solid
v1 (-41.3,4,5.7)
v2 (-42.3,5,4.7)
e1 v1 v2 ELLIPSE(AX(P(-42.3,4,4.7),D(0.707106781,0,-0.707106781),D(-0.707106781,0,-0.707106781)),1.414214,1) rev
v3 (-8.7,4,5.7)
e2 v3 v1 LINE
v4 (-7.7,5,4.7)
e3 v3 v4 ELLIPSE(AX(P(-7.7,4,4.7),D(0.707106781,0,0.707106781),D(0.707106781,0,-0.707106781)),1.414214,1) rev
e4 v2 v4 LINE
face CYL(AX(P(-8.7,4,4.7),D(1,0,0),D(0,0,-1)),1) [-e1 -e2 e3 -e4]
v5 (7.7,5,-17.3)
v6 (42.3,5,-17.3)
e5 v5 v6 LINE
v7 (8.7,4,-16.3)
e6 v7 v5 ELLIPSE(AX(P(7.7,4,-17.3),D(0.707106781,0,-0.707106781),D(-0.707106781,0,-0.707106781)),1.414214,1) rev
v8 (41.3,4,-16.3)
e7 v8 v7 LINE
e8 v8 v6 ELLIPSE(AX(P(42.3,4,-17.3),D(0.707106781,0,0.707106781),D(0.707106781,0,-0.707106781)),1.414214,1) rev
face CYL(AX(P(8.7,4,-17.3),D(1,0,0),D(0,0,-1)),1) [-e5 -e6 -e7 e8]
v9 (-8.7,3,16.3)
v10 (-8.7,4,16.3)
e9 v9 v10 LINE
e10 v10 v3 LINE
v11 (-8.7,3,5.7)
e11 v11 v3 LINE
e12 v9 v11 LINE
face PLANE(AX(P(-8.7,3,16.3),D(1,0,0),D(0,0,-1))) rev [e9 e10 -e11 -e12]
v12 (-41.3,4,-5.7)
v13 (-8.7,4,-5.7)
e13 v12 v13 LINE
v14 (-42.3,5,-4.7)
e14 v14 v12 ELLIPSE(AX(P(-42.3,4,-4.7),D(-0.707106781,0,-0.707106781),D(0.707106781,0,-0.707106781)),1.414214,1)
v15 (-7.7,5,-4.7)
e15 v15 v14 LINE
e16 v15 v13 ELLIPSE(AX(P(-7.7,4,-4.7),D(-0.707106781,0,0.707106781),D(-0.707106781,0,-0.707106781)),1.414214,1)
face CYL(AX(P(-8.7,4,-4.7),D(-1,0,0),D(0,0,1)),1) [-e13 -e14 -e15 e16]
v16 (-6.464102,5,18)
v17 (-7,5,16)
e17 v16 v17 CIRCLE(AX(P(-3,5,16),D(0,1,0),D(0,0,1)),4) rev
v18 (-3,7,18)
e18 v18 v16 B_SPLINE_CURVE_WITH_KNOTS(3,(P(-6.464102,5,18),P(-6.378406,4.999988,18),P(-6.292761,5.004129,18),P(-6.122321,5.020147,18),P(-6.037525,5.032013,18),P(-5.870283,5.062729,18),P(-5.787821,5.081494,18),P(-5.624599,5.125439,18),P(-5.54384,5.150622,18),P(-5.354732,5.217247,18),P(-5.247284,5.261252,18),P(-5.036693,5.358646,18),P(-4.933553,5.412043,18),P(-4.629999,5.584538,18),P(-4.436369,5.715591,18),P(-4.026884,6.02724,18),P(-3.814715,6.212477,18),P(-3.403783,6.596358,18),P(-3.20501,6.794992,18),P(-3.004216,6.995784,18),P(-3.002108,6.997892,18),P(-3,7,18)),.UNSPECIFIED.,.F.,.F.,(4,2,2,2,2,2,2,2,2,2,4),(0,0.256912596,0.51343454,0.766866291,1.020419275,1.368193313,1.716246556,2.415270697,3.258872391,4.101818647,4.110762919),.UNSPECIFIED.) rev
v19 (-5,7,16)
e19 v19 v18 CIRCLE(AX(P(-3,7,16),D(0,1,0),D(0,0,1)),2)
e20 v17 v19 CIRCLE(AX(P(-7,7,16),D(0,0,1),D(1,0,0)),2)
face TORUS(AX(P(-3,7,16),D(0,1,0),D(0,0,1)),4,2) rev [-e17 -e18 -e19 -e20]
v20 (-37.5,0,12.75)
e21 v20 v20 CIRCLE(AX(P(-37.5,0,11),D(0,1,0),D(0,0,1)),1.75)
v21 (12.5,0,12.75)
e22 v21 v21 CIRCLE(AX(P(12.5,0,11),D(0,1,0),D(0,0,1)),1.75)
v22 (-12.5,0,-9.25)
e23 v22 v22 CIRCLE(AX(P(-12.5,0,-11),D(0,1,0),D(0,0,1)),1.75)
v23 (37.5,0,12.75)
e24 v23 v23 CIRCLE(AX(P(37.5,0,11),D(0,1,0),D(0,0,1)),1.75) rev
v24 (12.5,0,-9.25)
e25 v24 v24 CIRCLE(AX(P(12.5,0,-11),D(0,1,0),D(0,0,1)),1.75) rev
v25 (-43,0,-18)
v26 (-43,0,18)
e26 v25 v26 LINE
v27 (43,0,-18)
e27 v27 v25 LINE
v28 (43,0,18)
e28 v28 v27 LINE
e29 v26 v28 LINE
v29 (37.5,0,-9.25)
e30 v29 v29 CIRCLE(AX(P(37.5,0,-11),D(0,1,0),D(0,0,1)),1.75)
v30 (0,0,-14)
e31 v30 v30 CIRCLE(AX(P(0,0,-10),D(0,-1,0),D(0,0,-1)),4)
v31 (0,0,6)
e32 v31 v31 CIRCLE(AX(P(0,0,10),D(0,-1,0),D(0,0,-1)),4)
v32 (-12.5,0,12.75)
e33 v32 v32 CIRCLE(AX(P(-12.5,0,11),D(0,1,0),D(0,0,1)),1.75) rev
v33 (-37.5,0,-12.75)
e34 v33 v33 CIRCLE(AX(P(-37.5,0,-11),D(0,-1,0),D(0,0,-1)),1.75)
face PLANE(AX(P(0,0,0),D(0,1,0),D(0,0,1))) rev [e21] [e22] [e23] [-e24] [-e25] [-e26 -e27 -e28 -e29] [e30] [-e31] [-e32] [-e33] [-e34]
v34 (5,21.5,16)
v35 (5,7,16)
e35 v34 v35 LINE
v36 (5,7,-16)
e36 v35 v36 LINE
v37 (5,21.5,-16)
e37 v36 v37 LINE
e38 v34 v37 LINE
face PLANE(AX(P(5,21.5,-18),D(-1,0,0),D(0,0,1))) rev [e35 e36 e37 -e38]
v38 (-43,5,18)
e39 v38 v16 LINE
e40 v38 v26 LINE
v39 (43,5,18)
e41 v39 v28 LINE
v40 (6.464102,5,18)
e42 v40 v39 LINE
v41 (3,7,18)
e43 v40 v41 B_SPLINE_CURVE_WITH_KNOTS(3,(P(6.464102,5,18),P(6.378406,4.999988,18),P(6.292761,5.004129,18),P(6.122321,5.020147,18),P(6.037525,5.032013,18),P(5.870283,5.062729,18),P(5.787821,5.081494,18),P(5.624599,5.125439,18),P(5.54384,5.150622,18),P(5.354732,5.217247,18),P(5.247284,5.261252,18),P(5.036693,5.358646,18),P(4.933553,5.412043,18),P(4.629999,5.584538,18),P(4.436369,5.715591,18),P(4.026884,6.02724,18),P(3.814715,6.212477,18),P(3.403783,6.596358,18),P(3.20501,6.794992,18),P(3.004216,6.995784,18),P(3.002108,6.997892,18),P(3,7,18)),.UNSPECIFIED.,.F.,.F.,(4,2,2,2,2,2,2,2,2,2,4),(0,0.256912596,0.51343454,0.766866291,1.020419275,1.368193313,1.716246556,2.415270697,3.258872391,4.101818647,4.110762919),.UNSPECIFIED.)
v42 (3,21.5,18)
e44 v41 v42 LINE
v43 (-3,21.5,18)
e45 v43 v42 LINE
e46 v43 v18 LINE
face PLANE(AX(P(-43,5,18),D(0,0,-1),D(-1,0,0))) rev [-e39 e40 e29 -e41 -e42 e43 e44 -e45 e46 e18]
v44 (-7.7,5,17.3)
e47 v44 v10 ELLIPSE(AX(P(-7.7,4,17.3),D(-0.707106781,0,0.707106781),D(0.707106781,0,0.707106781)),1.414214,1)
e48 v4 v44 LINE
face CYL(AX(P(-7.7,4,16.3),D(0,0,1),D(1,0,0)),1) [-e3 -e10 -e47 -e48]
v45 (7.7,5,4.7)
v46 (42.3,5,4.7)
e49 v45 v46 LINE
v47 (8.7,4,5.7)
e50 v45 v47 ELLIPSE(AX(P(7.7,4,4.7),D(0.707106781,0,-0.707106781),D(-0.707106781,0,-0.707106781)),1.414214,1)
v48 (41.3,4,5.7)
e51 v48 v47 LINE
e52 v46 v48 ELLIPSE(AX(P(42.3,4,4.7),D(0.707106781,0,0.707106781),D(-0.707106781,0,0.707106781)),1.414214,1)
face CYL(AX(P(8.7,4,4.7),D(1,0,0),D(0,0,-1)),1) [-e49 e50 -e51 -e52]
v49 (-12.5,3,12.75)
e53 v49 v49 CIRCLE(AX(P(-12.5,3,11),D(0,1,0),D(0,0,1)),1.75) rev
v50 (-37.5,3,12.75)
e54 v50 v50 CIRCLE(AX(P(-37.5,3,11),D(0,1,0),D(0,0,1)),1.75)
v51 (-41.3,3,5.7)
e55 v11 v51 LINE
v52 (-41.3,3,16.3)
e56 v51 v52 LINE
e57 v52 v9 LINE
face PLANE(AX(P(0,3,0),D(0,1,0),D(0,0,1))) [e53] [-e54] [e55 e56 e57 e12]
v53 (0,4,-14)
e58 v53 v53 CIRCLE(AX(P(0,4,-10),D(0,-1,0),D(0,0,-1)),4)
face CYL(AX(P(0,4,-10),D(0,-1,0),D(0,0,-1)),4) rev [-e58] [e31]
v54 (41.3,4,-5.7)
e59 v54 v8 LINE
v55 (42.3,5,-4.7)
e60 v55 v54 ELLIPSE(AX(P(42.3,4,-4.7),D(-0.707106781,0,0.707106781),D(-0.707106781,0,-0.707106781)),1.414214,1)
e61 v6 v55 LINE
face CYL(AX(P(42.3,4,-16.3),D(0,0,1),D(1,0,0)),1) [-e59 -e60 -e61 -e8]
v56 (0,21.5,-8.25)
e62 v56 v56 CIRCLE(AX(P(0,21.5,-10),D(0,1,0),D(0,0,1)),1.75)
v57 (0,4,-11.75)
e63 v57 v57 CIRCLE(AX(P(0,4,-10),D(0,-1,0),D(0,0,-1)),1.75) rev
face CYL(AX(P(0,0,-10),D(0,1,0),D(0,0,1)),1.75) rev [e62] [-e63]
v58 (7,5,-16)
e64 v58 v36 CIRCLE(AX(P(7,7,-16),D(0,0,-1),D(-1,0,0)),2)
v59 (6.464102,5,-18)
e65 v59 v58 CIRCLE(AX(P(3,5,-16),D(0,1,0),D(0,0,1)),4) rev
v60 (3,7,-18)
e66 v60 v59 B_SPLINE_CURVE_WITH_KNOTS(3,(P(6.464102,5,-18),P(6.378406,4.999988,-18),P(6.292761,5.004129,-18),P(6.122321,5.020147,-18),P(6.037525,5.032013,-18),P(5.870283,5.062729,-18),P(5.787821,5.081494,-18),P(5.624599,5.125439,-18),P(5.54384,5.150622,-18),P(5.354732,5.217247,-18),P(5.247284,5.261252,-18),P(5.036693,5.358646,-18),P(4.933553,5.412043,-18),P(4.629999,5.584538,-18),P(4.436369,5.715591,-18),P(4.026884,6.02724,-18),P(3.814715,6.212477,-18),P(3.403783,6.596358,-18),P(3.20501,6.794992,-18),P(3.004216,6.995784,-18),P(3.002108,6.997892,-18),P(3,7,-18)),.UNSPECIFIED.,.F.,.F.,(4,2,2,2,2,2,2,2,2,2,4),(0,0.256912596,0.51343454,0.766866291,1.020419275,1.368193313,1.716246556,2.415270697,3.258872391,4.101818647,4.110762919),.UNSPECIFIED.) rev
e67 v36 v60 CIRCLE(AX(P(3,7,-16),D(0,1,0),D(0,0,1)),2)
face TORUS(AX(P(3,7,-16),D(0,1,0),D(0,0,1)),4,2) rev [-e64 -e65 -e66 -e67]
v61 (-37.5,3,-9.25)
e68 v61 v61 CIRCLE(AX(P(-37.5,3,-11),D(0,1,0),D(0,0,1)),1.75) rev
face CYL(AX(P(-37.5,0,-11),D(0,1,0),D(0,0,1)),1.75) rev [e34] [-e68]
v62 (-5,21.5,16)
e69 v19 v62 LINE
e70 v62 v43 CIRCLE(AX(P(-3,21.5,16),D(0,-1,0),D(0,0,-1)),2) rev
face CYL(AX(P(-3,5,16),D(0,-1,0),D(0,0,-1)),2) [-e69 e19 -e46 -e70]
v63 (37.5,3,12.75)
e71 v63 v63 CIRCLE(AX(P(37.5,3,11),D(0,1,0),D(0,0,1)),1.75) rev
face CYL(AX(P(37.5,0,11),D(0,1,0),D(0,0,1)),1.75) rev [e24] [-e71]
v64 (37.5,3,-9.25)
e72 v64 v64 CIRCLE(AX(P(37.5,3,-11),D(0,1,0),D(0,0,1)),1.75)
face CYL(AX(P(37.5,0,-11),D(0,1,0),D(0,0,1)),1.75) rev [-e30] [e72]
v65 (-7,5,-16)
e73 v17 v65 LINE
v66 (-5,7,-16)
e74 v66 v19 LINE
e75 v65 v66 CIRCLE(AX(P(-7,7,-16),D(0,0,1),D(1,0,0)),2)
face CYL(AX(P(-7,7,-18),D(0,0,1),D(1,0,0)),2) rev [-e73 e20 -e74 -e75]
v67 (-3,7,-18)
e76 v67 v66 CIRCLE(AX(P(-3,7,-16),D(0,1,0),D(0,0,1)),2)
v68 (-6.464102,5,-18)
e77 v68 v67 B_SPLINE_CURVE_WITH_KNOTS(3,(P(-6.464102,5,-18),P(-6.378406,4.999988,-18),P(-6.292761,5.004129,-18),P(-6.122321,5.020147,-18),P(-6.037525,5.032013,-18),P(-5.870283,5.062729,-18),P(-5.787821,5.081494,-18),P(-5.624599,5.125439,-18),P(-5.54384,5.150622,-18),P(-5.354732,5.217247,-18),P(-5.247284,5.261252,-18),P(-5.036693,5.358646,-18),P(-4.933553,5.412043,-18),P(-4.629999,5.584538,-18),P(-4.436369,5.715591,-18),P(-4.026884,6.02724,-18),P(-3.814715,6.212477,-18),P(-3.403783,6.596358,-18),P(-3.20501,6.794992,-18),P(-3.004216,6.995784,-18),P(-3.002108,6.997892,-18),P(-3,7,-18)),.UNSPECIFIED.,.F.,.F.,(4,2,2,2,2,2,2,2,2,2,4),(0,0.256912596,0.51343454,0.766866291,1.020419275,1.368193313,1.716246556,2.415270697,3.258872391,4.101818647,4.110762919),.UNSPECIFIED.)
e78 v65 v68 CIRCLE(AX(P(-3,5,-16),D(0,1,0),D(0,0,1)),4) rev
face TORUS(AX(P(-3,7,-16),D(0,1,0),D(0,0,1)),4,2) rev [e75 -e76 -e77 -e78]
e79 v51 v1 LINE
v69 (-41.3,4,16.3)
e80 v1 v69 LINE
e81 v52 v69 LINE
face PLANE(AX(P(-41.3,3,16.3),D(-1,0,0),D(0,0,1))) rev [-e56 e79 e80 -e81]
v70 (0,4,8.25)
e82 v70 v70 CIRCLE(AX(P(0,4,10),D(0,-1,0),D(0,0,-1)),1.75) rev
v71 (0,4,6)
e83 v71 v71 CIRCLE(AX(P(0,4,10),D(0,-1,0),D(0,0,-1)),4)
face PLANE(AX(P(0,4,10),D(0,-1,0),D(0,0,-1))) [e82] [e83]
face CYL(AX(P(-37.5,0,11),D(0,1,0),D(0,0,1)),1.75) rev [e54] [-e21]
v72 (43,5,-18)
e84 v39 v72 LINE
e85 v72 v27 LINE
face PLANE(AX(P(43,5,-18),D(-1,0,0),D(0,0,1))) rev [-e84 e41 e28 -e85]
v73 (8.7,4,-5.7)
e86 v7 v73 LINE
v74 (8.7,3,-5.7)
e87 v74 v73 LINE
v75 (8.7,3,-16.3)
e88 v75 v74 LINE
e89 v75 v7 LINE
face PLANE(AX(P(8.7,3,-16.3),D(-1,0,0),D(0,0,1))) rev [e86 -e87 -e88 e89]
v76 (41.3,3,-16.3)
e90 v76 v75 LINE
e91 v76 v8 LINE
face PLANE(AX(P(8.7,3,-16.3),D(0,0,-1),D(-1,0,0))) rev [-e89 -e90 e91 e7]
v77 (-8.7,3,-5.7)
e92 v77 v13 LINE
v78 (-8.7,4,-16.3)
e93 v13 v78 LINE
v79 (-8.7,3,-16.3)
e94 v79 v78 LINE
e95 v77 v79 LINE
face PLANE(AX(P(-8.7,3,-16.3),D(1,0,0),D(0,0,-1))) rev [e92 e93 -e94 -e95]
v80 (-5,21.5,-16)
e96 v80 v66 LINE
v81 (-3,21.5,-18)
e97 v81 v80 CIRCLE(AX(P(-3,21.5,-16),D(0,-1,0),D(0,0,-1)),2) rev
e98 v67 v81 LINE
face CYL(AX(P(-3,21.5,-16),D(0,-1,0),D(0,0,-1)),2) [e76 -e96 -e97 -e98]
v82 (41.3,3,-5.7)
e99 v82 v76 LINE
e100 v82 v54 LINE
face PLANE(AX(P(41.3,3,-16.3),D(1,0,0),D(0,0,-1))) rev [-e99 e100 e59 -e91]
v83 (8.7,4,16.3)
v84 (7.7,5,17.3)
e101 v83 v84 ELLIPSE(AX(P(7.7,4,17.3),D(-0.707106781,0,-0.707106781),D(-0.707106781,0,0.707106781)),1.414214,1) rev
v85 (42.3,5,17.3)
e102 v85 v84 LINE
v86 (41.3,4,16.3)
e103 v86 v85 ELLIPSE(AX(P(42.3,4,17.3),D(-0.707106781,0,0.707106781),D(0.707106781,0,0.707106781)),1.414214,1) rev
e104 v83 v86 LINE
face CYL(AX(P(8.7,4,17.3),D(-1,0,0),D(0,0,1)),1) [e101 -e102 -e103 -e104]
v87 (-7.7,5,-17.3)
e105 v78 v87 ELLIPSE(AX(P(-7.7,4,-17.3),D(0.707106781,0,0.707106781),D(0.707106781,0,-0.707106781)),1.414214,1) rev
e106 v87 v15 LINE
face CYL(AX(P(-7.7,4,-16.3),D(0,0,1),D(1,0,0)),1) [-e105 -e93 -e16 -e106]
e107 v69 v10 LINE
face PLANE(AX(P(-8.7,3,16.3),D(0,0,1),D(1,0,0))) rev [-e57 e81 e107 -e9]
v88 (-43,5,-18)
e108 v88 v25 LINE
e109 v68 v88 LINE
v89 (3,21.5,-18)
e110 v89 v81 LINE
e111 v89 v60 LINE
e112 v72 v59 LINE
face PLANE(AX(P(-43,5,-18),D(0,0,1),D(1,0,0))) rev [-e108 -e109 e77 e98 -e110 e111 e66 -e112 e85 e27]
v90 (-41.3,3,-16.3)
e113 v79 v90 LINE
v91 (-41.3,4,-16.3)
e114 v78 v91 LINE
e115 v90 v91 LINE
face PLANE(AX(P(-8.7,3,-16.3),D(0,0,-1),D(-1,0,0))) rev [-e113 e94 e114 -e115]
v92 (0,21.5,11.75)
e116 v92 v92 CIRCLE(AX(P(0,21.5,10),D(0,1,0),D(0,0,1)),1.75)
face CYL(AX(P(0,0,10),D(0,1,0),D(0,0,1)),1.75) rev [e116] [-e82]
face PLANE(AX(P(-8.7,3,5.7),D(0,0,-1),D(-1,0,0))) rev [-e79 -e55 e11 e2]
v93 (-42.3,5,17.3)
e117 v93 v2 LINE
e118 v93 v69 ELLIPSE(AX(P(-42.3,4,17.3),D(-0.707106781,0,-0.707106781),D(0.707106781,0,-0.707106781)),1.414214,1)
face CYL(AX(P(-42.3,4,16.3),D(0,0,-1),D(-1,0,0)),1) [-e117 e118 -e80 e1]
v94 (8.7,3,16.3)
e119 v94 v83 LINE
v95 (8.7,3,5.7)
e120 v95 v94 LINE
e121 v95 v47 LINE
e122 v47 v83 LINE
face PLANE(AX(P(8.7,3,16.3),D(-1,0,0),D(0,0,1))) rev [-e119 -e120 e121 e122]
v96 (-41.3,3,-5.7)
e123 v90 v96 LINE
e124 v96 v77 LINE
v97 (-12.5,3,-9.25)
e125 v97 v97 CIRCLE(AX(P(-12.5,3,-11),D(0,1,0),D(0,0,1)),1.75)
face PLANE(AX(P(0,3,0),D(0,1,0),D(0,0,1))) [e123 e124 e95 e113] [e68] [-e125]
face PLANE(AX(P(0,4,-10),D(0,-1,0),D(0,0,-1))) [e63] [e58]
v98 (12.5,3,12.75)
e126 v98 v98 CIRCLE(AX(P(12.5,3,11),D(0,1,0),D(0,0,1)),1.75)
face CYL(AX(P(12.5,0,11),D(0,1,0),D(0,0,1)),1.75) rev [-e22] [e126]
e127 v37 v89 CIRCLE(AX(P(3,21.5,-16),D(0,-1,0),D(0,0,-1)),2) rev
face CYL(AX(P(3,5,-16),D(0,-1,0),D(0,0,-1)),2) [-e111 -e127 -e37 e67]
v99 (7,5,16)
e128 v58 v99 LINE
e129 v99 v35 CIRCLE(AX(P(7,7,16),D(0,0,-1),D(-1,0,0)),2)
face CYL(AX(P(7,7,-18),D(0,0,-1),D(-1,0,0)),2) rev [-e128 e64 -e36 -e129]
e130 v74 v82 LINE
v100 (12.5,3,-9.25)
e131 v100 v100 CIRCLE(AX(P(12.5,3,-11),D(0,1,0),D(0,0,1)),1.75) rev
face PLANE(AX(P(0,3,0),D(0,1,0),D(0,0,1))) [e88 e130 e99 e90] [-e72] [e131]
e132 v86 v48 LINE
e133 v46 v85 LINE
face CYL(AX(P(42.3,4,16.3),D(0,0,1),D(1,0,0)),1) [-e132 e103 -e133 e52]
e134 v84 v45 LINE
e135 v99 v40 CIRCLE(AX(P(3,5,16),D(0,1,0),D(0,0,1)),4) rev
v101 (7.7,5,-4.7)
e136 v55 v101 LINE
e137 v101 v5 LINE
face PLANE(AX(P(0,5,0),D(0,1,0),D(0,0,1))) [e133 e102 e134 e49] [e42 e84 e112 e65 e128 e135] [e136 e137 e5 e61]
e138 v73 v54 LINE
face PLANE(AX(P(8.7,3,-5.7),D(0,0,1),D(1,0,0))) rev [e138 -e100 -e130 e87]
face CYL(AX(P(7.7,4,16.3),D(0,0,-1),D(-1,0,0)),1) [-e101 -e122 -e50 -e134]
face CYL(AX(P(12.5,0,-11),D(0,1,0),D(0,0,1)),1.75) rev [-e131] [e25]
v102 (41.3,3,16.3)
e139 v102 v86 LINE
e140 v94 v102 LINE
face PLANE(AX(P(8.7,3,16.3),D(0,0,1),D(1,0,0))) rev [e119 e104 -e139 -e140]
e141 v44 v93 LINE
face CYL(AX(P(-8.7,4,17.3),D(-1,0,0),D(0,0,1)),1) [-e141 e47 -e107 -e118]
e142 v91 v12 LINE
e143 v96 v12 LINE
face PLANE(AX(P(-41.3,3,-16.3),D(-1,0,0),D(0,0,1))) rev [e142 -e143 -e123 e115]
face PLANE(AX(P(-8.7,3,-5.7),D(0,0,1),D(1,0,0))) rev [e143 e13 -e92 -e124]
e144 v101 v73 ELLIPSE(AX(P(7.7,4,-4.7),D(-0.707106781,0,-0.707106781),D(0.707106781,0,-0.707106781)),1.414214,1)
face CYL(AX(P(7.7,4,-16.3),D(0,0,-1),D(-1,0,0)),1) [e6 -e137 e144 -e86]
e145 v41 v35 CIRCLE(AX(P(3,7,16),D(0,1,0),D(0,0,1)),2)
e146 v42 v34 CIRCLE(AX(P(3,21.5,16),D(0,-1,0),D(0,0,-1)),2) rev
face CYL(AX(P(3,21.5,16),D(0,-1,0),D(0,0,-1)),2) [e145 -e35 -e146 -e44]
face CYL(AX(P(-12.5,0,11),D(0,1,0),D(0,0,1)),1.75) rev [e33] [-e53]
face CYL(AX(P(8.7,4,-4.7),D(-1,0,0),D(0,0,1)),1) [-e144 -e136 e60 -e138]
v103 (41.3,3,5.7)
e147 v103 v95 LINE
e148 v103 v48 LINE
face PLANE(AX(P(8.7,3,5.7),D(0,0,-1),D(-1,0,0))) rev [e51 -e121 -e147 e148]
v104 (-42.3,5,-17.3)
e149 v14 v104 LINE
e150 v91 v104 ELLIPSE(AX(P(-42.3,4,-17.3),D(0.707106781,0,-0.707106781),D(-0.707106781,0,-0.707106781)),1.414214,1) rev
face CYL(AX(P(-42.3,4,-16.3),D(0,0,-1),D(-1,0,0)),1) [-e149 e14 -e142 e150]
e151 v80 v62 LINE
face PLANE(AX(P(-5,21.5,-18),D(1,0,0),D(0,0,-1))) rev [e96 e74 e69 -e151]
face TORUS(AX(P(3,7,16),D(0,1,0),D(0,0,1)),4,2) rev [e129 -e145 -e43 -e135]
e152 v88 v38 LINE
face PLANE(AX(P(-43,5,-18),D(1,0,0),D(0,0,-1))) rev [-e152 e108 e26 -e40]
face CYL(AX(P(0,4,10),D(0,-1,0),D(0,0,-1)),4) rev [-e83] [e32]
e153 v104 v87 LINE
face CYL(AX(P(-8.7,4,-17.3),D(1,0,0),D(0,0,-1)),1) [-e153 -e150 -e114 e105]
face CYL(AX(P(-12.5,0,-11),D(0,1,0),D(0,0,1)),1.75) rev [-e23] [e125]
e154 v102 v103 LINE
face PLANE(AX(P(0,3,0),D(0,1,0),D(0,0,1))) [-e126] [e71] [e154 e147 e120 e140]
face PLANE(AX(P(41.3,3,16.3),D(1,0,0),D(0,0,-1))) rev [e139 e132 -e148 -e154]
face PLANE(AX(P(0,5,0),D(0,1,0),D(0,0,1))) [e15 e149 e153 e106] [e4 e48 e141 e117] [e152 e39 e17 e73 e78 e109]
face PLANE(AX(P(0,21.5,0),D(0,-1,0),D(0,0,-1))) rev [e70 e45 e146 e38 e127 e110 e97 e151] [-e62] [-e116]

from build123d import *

# Parameters (mm, degrees)
SKETCH_1_W          = 86
SKETCH_1_H          = 36
EXTRUDE_1_DEPTH     = 5
SKETCH_5_W          = 32.6
SKETCH_5_H          = 10.6
SKETCH_5_R          = 1.75
CUT_EXTRUDE_2_DEPTH = 2
SKETCH_5_3_R        = 1.75
CUT_EXTRUDE_3_DEPTH = 47.882832679
FILLET_2_R          = 1
SKETCH_8_W          = 10
SKETCH_8_H          = 36
EXTRUDE_2_DEPTH     = 16.5
SKETCH_9_R          = 1.75
CUT_EXTRUDE_4_DEPTH = 52.334686129
FILLET_3_R          = 2
FILLET_4_R          = 2
SKETCH_10_R         = 4
CUT_EXTRUDE_5_DEPTH = 4


with BuildPart() as part:
    # ｽｹｯﾁ1 → ﾎﾞｽ - 押し出し1 (new body)
    with BuildSketch(Plane(origin=(0, 0, 0), x_dir=(1, 0, 0), z_dir=(0, 1, 0))):
        Rectangle(SKETCH_1_W, SKETCH_1_H)
    extrude(amount=EXTRUDE_1_DEPTH)

    # ｽｹｯﾁ5 → ｶｯﾄ - 押し出し2 (cut)
    # profile 1 of 4: a face of its own
    with BuildSketch(Plane(origin=(0, 5, 0), x_dir=(1, 0, 0), z_dir=(0, 1, 0))):
        with Locations((-25, -11)):
            Rectangle(SKETCH_5_W, SKETCH_5_H)
        with Locations(Location((-37.5, -11, 0), (0, 0, 270))):
            Circle(SKETCH_5_R, mode=Mode.SUBTRACT)
        with Locations(Location((-12.5, -11, 0), (0, 0, 90))):
            Circle(SKETCH_5_R, mode=Mode.SUBTRACT)
    # profile 2 of 4: a face of its own
    with BuildSketch(Plane(origin=(0, 5, 0), x_dir=(1, 0, 0), z_dir=(0, 1, 0))):
        with Locations((-25, 11)):
            Rectangle(SKETCH_5_W, SKETCH_5_H)
        with Locations(Location((-12.5, 11, 0), (0, 0, 270))):
            Circle(SKETCH_5_R, mode=Mode.SUBTRACT)
        with Locations(Location((-37.5, 11, 0), (0, 0, 90))):
            Circle(SKETCH_5_R, mode=Mode.SUBTRACT)
    # profile 3 of 4: a face of its own
    with BuildSketch(Plane(origin=(0, 5, 0), x_dir=(1, 0, 0), z_dir=(0, 1, 0))):
        with Locations((25, 11)):
            Rectangle(SKETCH_5_W, SKETCH_5_H)
        with Locations(Location((37.5, 11, 0), (0, 0, 270))):
            Circle(SKETCH_5_R, mode=Mode.SUBTRACT)
        with Locations(Location((12.5, 11, 0), (0, 0, 90))):
            Circle(SKETCH_5_R, mode=Mode.SUBTRACT)
    # profile 4 of 4: a face of its own
    with BuildSketch(Plane(origin=(0, 5, 0), x_dir=(1, 0, 0), z_dir=(0, 1, 0))):
        with Locations((25, -11)):
            Rectangle(SKETCH_5_W, SKETCH_5_H)
        with Locations(Location((12.5, -11, 0), (0, 0, 270))):
            Circle(SKETCH_5_R, mode=Mode.SUBTRACT)
        with Locations(Location((37.5, -11, 0), (0, 0, 90))):
            Circle(SKETCH_5_R, mode=Mode.SUBTRACT)
    extrude(amount=-CUT_EXTRUDE_2_DEPTH, mode=Mode.SUBTRACT)

    # ｽｹｯﾁ5<3> → ｶｯﾄ - 押し出し3 (cut, through all)
    with BuildSketch(Plane(origin=(0, 5, 0), x_dir=(1, 0, 0), z_dir=(0, 1, 0))):
        with Locations(Location((37.5, -11, 0), (0, 0, 270))):
            Circle(SKETCH_5_3_R)
        with Locations(Location((12.5, -11, 0), (0, 0, 270))):
            Circle(SKETCH_5_3_R)
        with Locations(Location((37.5, 11, 0), (0, 0, 270))):
            Circle(SKETCH_5_3_R)
        with Locations(Location((12.5, 11, 0), (0, 0, 270))):
            Circle(SKETCH_5_3_R)
        with Locations(Location((-12.5, 11, 0), (0, 0, 270))):
            Circle(SKETCH_5_3_R)
        with Locations(Location((-12.5, -11, 0), (0, 0, 270))):
            Circle(SKETCH_5_3_R)
        with Locations(Location((-37.5, -11, 0), (0, 0, 270))):
            Circle(SKETCH_5_3_R)
        with Locations(Location((-37.5, 11, 0), (0, 0, 270))):
            Circle(SKETCH_5_3_R)
    extrude(amount=-CUT_EXTRUDE_3_DEPTH, mode=Mode.SUBTRACT)

    # ﾌｨﾚｯﾄ2
    fillet_2_edges = [part.edges().sort_by_distance(p)[0] for p in [
        (-8.7, 5, 11),
        (-25, 5, 5.7),
        (-41.3, 5, 11),
        (-25, 5, 16.3),
        (-25, 5, -16.3),
        (-41.3, 5, -11),
        (-25, 5, -5.7),
        (-8.7, 5, -11),
        (8.7, 5, -11),
        (25, 5, -5.7),
        (41.3, 5, -11),
        (25, 5, -16.3),
        (25, 5, 16.3),
        (41.3, 5, 11),
        (25, 5, 5.7),
        (8.7, 5, 11),
    ]]
    fillet(fillet_2_edges, radius=FILLET_2_R)

    # ｽｹｯﾁ8 → ﾎﾞｽ - 押し出し2 (add)
    with BuildSketch(Plane(origin=(0, 5, 0), x_dir=(1, 0, 0), z_dir=(0, 1, 0))):
        Rectangle(SKETCH_8_W, SKETCH_8_H)
    extrude(amount=EXTRUDE_2_DEPTH)

    # ｽｹｯﾁ9 → ｶｯﾄ - 押し出し4 (cut, through all)
    with BuildSketch(Plane(origin=(0, 21.5, 0), x_dir=(1, 0, 0), z_dir=(0, 1, 0))):
        with Locations(Location((0, -10, 0), (0, 0, 270))):
            Circle(SKETCH_9_R)
        with Locations(Location((0, 10, 0), (0, 0, 270))):
            Circle(SKETCH_9_R)
    extrude(amount=-CUT_EXTRUDE_4_DEPTH, mode=Mode.SUBTRACT)

    # ﾌｨﾚｯﾄ3
    fillet_3_edges = [part.edges().sort_by_distance(p)[0] for p in [
        (-5, 13.25, -18),
        (-5, 13.25, 18),
        (5, 13.25, 18),
        (5, 13.25, -18),
    ]]
    fillet(fillet_3_edges, radius=FILLET_3_R)

    # ﾌｨﾚｯﾄ4
    # the kernel refuses this fillet: 2 mm, written as the material it adds along each edge
    with BuildSketch(Plane(origin=(5, 5, 16), x_dir=(1, 0, 0), z_dir=(0, 0, -1)), Plane(origin=(-5, 5, -16), x_dir=(-1, 0, 0), z_dir=(0, 0, 1))) as fillet_4_piece_1:
        with BuildLine():
            CenterArc((FILLET_4_R, -FILLET_4_R), FILLET_4_R, 90, 90)
            Line((0, -FILLET_4_R), (0, 0))
            Line((0, 0), (FILLET_4_R, 0))
        make_face()
    extrude(amount=32)
    with BuildSketch(Plane(origin=(3, 5, 16), x_dir=(-0.5976672776328272, 0, -0.8017442392976484), z_dir=(0.8017442392976484, 0, -0.5976672776328272))) as fillet_4_piece_2_section:
        with BuildLine():
            CenterArc((2 + FILLET_4_R, FILLET_4_R), FILLET_4_R, 180, 90)
            Line((2 + FILLET_4_R, 0), (2, 0))
            Line((2, 0), (2, FILLET_4_R))
        make_face()
    fillet_4_piece_2 = revolve(axis=Axis((3, 5, 16), (0, 1, 0)), revolution_arc=233.296989237, mode=Mode.PRIVATE)
    fillet_4_piece_2 = split(fillet_4_piece_2, bisect_by=Plane(origin=(4.499877774, 5.623256904, 18), z_dir=(0, 0, -1)), keep=Keep.TOP, mode=Mode.PRIVATE)
    add(fillet_4_piece_2)
    with BuildSketch(Plane(origin=(-3, 5, 16), x_dir=(0.5976672776328272, 0, -0.8017442392976484), z_dir=(-0.8017442392976484, 0, -0.5976672776328272))) as fillet_4_piece_3_section:
        with BuildLine():
            CenterArc((2 + FILLET_4_R, -FILLET_4_R), FILLET_4_R, 90, 90)
            Line((2, -FILLET_4_R), (2, 0))
            Line((2, 0), (2 + FILLET_4_R, 0))
        make_face()
    fillet_4_piece_3 = revolve(axis=Axis((-3, 5, 16), (0, -1, 0)), revolution_arc=233.296989237, mode=Mode.PRIVATE)
    fillet_4_piece_3 = split(fillet_4_piece_3, bisect_by=Plane(origin=(-4.499877889, 5.623256622, 18), z_dir=(0, 0, -1)), keep=Keep.TOP, mode=Mode.PRIVATE)
    add(fillet_4_piece_3)
    with BuildSketch(Plane(origin=(-3, 5, -16), x_dir=(-1, 0, 0), z_dir=(0, 0, 1))) as fillet_4_piece_4_section:
        with BuildLine():
            CenterArc((2 + FILLET_4_R, -FILLET_4_R), FILLET_4_R, 90, 90)
            Line((2, -FILLET_4_R), (2, 0))
            Line((2, 0), (2 + FILLET_4_R, 0))
        make_face()
    fillet_4_piece_4 = revolve(axis=Axis((-3, 5, -16), (0, -1, 0)), revolution_arc=233.296989237, mode=Mode.PRIVATE)
    fillet_4_piece_4 = split(fillet_4_piece_4, bisect_by=Plane(origin=(-5.439550498, 5.334600403, -18), z_dir=(0, 0, 1)), keep=Keep.TOP, mode=Mode.PRIVATE)
    add(fillet_4_piece_4)
    with BuildSketch(Plane(origin=(3, 5, -16), x_dir=(-0.5976672776328279, 0, 0.8017442392976479), z_dir=(0.8017442392976479, 0, 0.5976672776328279))) as fillet_4_piece_5_section:
        with BuildLine():
            CenterArc((2 + FILLET_4_R, -FILLET_4_R), FILLET_4_R, 90, 90)
            Line((2, -FILLET_4_R), (2, 0))
            Line((2, 0), (2 + FILLET_4_R, 0))
        make_face()
    fillet_4_piece_5 = revolve(axis=Axis((3, 5, -16), (0, -1, 0)), revolution_arc=233.296989237, mode=Mode.PRIVATE)
    fillet_4_piece_5 = split(fillet_4_piece_5, bisect_by=Plane(origin=(4.499877909, 5.62325654, -18), z_dir=(0, 0, 1)), keep=Keep.TOP, mode=Mode.PRIVATE)
    add(fillet_4_piece_5)

    # ｽｹｯﾁ10 → ｶｯﾄ - 押し出し5 (cut)
    with BuildSketch(Plane(origin=(0, 0, 0), x_dir=(-1, 0, 0), z_dir=(0, -1, 0))):
        with Locations(Location((0, -10, 0), (0, 0, 90))):
            Circle(SKETCH_10_R)
        with Locations(Location((0, 10, 0), (0, 0, 90))):
            Circle(SKETCH_10_R)
    extrude(amount=-CUT_EXTRUDE_5_DEPTH, mode=Mode.SUBTRACT)


solid = part.part
